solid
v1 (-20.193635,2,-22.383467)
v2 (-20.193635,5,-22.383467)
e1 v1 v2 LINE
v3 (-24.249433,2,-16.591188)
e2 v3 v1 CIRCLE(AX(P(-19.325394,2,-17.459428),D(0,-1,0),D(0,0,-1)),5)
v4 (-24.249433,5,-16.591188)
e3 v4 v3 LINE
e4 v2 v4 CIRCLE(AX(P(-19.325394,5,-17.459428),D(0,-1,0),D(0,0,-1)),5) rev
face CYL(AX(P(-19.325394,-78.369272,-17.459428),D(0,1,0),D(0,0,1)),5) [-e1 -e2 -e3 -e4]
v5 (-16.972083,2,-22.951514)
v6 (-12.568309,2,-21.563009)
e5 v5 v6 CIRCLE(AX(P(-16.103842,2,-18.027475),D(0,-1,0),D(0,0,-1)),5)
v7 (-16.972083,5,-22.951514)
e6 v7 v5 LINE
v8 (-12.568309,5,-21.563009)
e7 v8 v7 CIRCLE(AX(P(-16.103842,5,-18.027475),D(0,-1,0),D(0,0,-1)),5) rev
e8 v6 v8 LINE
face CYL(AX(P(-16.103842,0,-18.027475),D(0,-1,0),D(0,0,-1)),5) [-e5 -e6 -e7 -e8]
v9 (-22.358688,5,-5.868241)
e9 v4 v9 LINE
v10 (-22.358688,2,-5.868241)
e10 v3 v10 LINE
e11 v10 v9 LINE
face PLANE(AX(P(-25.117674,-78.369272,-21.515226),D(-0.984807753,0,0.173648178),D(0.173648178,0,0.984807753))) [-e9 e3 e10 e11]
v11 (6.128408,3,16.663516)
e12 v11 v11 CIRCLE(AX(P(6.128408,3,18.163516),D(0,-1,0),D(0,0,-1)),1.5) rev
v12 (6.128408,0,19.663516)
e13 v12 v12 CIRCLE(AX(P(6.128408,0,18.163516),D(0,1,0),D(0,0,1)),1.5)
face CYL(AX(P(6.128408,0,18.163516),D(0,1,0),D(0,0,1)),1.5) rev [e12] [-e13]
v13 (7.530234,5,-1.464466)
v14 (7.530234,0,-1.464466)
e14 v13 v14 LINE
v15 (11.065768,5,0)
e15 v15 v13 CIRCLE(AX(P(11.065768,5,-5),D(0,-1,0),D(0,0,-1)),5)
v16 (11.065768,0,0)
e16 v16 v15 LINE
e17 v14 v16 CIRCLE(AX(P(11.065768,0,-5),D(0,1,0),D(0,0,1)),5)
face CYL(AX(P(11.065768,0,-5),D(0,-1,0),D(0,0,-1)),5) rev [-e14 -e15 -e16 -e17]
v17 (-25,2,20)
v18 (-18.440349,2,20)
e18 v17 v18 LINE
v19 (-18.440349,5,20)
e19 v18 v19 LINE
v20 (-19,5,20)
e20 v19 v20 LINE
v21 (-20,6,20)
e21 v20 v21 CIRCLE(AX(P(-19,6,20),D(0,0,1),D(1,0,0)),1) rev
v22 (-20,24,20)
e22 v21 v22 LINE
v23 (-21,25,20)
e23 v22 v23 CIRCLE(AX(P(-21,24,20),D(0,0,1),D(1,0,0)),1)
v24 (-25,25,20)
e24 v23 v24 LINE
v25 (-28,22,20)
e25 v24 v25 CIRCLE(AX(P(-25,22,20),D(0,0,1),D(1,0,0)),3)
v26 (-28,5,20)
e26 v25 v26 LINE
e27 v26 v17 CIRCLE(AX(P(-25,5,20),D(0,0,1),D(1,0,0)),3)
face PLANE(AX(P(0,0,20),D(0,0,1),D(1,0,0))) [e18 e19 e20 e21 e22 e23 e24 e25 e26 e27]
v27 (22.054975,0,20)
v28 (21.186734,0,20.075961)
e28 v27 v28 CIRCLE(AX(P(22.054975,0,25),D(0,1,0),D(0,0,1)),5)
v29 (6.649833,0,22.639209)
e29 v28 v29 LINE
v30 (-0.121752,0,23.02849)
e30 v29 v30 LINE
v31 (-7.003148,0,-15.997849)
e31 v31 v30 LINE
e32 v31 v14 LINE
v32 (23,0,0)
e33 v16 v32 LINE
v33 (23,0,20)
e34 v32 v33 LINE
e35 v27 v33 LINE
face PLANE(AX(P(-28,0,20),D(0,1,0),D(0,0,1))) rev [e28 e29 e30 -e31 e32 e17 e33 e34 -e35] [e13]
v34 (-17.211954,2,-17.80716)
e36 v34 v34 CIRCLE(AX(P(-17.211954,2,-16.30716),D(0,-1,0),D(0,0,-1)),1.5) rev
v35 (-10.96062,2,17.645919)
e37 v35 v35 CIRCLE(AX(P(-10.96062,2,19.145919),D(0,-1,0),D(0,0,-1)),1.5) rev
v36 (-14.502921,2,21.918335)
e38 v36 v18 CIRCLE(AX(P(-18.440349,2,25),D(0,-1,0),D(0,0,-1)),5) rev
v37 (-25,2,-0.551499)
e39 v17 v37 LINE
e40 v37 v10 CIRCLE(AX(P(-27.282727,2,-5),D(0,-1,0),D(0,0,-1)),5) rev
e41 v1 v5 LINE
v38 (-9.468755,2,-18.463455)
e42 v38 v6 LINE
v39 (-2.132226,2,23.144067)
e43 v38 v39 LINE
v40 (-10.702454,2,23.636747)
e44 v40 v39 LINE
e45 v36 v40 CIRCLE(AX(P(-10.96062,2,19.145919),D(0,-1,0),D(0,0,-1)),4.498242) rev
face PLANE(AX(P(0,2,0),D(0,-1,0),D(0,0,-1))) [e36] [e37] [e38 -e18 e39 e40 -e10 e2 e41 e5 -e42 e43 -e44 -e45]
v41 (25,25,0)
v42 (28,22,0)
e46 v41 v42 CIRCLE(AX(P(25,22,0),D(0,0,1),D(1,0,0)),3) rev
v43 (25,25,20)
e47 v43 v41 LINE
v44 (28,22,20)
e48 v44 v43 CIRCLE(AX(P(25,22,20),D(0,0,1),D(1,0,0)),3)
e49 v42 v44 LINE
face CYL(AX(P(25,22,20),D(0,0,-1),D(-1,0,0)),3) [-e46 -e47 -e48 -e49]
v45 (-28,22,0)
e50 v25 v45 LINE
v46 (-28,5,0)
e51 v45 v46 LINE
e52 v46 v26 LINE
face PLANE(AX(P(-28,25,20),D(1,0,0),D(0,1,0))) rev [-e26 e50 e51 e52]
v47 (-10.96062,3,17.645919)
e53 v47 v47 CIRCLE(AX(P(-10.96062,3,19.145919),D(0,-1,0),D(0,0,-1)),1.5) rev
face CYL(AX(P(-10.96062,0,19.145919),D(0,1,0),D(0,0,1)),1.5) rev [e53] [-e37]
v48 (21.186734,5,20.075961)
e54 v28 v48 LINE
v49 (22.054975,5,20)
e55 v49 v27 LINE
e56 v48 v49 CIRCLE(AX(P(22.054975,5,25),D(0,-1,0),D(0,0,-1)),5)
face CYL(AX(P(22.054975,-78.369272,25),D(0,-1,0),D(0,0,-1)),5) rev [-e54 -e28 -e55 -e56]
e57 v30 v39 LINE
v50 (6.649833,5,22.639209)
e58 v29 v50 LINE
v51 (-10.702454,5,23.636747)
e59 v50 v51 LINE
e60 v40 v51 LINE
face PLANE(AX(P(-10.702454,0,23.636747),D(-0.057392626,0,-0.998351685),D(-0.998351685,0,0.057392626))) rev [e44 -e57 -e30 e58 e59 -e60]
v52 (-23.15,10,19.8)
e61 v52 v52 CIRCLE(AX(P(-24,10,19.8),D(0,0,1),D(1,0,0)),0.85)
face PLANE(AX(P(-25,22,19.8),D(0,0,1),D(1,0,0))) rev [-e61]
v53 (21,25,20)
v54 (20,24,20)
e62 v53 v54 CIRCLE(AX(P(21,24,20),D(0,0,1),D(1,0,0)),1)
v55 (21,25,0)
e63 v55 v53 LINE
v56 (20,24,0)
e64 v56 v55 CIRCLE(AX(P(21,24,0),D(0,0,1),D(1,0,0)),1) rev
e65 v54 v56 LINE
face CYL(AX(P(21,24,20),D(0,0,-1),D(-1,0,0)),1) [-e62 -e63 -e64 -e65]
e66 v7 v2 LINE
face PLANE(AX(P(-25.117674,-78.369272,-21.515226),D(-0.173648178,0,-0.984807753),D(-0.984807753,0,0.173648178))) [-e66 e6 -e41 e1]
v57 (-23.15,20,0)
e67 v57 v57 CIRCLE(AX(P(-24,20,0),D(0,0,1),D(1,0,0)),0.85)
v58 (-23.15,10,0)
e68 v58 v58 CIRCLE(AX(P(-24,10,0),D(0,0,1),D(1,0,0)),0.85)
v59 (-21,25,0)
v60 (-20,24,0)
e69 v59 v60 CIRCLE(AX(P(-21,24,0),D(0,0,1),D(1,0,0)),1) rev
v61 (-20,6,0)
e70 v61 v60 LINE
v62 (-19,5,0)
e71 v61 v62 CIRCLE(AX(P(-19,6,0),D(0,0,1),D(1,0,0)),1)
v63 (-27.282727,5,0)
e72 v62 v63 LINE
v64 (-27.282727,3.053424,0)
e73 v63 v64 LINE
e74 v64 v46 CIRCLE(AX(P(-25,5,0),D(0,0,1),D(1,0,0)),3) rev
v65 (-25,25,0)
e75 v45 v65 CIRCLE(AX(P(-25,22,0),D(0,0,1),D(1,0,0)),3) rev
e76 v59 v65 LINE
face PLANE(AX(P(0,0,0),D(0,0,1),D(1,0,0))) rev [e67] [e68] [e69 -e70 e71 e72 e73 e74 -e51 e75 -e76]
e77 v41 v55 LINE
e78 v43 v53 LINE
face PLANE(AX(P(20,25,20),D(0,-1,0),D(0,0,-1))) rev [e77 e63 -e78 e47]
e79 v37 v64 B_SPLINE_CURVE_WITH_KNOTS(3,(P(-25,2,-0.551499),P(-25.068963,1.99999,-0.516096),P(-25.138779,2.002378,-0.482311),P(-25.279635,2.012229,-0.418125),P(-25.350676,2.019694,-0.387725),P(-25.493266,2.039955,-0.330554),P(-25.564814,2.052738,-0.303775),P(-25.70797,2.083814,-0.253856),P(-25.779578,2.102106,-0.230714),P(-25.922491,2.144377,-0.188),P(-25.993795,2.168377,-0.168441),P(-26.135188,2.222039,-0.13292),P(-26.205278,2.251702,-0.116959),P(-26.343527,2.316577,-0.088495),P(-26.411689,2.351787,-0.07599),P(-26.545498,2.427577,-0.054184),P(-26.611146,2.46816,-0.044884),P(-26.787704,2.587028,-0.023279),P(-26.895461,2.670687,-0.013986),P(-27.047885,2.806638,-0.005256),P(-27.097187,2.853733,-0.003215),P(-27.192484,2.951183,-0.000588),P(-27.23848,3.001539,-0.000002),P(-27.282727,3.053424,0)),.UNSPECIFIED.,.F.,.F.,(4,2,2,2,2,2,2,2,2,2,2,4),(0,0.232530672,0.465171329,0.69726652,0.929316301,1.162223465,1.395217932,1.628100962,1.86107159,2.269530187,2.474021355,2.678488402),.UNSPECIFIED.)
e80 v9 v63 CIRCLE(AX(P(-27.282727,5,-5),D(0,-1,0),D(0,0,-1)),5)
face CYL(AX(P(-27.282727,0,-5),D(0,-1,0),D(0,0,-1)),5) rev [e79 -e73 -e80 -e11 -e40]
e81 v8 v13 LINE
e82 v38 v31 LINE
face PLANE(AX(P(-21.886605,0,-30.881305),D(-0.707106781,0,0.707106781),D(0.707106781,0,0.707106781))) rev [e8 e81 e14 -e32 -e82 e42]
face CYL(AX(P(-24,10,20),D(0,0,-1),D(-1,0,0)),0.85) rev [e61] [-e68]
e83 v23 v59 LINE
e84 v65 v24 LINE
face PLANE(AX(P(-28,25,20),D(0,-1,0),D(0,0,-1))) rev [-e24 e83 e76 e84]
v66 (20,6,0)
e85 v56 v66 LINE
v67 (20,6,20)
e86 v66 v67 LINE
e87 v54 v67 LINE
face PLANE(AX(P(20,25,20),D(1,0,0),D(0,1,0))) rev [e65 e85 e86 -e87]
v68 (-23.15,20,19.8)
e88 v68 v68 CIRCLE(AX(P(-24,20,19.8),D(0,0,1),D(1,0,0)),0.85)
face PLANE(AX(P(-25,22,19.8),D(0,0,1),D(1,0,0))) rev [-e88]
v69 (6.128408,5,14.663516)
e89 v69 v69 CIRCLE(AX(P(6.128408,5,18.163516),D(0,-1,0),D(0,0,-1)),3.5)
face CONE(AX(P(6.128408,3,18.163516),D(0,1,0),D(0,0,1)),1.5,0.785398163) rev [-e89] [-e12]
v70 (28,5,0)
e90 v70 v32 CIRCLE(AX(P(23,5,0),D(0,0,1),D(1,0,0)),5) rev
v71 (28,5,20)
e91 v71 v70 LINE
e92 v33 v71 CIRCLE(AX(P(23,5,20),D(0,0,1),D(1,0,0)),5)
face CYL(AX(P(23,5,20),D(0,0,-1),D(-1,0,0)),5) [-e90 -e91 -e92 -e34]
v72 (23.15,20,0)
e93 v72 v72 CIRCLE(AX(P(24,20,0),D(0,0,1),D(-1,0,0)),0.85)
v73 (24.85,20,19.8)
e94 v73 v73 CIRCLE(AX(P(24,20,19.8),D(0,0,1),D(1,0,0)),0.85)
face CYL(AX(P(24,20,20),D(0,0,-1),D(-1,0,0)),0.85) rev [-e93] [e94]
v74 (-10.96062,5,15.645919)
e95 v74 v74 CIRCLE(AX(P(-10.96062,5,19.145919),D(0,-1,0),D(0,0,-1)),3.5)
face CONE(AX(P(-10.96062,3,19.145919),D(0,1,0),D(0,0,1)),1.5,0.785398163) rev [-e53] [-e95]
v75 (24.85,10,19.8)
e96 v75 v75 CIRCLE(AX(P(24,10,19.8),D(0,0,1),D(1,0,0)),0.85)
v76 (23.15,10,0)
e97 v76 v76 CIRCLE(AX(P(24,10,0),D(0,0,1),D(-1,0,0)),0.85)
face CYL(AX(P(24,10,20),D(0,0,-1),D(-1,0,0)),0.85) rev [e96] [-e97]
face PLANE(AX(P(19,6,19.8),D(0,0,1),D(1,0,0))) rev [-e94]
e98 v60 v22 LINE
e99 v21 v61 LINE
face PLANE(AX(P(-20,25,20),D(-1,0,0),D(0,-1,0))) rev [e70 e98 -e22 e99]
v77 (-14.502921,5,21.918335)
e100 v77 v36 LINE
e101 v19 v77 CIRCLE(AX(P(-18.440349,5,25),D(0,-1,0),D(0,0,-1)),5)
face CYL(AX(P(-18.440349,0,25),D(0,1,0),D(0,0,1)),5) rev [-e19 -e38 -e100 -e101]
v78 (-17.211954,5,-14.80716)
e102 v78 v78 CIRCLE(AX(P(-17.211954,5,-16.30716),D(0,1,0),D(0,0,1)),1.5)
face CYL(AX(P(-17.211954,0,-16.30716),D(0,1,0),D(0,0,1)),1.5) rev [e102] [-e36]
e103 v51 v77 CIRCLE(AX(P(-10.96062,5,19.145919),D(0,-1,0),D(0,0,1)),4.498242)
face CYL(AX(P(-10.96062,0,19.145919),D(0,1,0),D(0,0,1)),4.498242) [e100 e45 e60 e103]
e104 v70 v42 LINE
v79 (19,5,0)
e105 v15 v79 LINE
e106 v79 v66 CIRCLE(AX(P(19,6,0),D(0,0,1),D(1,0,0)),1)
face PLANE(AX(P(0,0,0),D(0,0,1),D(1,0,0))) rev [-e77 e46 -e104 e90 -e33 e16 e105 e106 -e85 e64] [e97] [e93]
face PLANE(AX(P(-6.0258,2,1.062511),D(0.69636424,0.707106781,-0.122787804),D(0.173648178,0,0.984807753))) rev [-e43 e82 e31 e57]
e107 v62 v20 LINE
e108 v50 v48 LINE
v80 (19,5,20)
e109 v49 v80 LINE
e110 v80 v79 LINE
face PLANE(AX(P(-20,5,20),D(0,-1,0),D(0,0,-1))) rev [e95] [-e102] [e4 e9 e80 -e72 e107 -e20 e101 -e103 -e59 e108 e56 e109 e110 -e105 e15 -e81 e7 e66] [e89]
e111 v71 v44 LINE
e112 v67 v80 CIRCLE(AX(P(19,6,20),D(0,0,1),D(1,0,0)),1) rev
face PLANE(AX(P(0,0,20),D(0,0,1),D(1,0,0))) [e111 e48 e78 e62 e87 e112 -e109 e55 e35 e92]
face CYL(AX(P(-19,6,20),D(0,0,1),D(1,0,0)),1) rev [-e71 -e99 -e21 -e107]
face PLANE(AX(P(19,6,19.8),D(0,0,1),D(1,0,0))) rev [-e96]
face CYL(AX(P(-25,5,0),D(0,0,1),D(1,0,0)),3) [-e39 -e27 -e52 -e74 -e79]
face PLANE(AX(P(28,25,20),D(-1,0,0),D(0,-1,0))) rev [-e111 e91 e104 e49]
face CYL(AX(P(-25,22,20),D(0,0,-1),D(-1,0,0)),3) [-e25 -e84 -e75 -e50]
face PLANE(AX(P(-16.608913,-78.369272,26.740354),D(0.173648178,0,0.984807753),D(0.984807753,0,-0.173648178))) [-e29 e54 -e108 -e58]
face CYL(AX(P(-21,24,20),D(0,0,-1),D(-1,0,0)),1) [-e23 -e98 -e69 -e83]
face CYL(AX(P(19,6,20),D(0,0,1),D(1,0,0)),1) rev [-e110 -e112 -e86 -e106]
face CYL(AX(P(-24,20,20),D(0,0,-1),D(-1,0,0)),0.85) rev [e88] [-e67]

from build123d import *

# Parameters (mm, degrees)
ESQUISSE1_R             = 0.85
BOSS_EXTRU_1_DEPTH      = 20
BOSS_EXTRU_2_DEPTH      = 5
ESQUISSE3_R             = 1.5
ENL_V_MAT_EXTRU_1_DEPTH = 47.234781527
CONG_1_R                = 1
CONG_2_R                = 3
CHANFREIN2_SIZE         = 2
ENL_V_MAT_EXTRU_2_DEPTH = 2
CHANFREIN3_SIZE         = 2
ENL_V_MAT_EXTRU_3_DEPTH = 47.234781527
CONG_3_R                = 5
CONG_4_R                = 3
BOSS_EXTRU_3_DEPTH      = 0.2


with BuildPart() as part:
    # Esquisse1 → Boss.-Extru.1 (new body)
    with BuildSketch(Plane.XY):
        Polygon((20, 25), (28, 25), (28, 0), (-28, 0), (-28, 25), (-20, 25), (-20, 5), (20, 5), align=None)
        with Locations((-24, 20)):
            Circle(ESQUISSE1_R, mode=Mode.SUBTRACT)
        with Locations((-24, 10)):
            Circle(ESQUISSE1_R, mode=Mode.SUBTRACT)
        with Locations(Location((24, 10, 0), (0, 0, 180))):
            Circle(ESQUISSE1_R, mode=Mode.SUBTRACT)
        with Locations(Location((24, 20, 0), (0, 0, 180))):
            Circle(ESQUISSE1_R, mode=Mode.SUBTRACT)
    extrude(amount=BOSS_EXTRU_1_DEPTH)

    # Esquisse2 → Boss.-Extru.2 (add)
    with BuildSketch(Plane(origin=(0, 5, 0), x_dir=(1, 0, 0), z_dir=(0, 1, 0))):
        Polygon((-25.117673753, 21.515226358), (28, 30.881305394), (28, -18.874598589), (-16.608913047, -26.740353539), align=None)
    extrude(amount=-BOSS_EXTRU_2_DEPTH)

    # Esquisse3 → Enlèv. mat.-Extru.1 (cut, through all)
    with BuildSketch(Plane(origin=(0, 5, 0), x_dir=(1, 0, 0), z_dir=(0, 1, 0))):
        with Locations(Location((-17.211954407, 16.307159752, 0), (0, 0, 270))):
            Circle(ESQUISSE3_R)
        with Locations(Location((6.128408145, -18.163515842, 0), (0, 0, 270))):
            Circle(ESQUISSE3_R)
        with Locations(Location((-10.960620011, -19.145919356, 0), (0, 0, 270))):
            Circle(ESQUISSE3_R)
    extrude(amount=-ENL_V_MAT_EXTRU_1_DEPTH, mode=Mode.SUBTRACT)

    # Congé1
    cong_1_edges = [part.edges().sort_by_distance(p)[0] for p in [
        (-20, 25, 10),
        (-20, 5, 10),
        (20, 5, 10),
        (20, 25, 10),
    ]]
    fillet(cong_1_edges, radius=CONG_1_R)

    # Congé2
    cong_2_edges = [part.edges().sort_by_distance(p)[0] for p in [
        (-28, 25, 10),
        (28, 25, 10),
    ]]
    fillet(cong_2_edges, radius=CONG_2_R)

    # Chanfrein2
    chanfrein2_edges = [part.edges().sort_by_distance(p)[0] for p in [
        (-10.960620011, 5, 17.645919356),
        (6.128408145, 5, 16.663515842),
    ]]
    chamfer(chanfrein2_edges, length=CHANFREIN2_SIZE)

    # Esquisse4 → Enlèv. mat.-Extru.2 (cut)
    with BuildSketch(Plane.XZ):
        Polygon((-48.23971452, 32.31771726), (0.015865378, 23.808956555), (-8.492895328, -24.446623343), (-56.748475225, -15.937862637), align=None)
    extrude(amount=-ENL_V_MAT_EXTRU_2_DEPTH, mode=Mode.SUBTRACT)

    # Chanfrein3
    chanfrein3_edges = [part.edges().sort_by_distance(p)[0] for p in [
        (-4.238514975, 2, -0.318833394),
    ]]
    chamfer(chanfrein3_edges, length=CHANFREIN3_SIZE - 0.0001)  # a hair under: the kernel refuses the full size

    # Esquisse5 → Enlèv. mat.-Extru.3 (cut, through all)
    with BuildSketch(Plane(origin=(0, 5, 0), x_dir=(1, 0, 0), z_dir=(0, 1, 0))):
        with BuildLine():
            Line((-28, -20), (-15.377035546, -20))
            ThreePointArc((-15.377035546, -20), (-13.722728197, -22.696262762), (-10.702454097, -23.636746706))
            Line((-10.702454097, -23.636746706), (6.649832575, -22.639209149))
            Line((6.649832575, -22.639209149), (6.649832575, -26.740353539))
            Line((6.649832575, -26.740353539), (-28, -26.740353539))
            Line((-28, -26.740353539), (-28, -20))
        make_face()
        Polygon((28, 30.881305394), (-21.886605112, 30.881305394), (8.994700282, 0), (28, 0), align=None)
    extrude(amount=-ENL_V_MAT_EXTRU_3_DEPTH, mode=Mode.SUBTRACT)

    # Congé3
    cong_3_edges = [part.edges().sort_by_distance(p)[0] for p in [
        (28, 0, 10),
        (-25.117673753, 3.5, -21.515226358),
        (-15.377035546, 3.5, 20),
        (-14.408791034, 3.5, -23.403491315),
        (8.994700282, 2.5, 0),
        (-21.32395885, 3.5, 0),
        (21.617531437, 2.5, 20),
    ]]
    fillet(cong_3_edges, radius=CONG_3_R)

    # Congé4
    cong_4_edges = [part.edges().sort_by_distance(p)[0] for p in [
        (-28, 2, 10),
    ]]
    fillet(cong_4_edges, radius=CONG_4_R)

    # Esquisse6 → Boss.-Extru.3 (add)
    with BuildSketch(Plane.XY.offset(20)):
        with BuildLine():
            Line((-28, 22), (-28, 5))
            ThreePointArc((-28, 5), (-27.121320344, 2.878679656), (-25, 2))
            Line((-25, 2), (-18.440348512, 2))
            Line((-18.440348512, 2), (-18.440348512, 5))
            Line((-18.440348512, 5), (-19, 5))
            ThreePointArc((-19, 5), (-19.707106781, 5.292893219), (-20, 6))
            Line((-20, 6), (-20, 24))
            ThreePointArc((-20, 24), (-20.292893219, 24.707106781), (-21, 25))
            Line((-21, 25), (-25, 25))
            ThreePointArc((-25, 25), (-27.121320344, 24.121320344), (-28, 22))
        make_face()
        with BuildLine():
            Line((19, 5), (22.054974755, 5))
            Line((22.054974755, 5), (22.054974755, 0))
            Line((22.054974755, 0), (23, 0))
            ThreePointArc((23, 0), (26.535533906, 1.464466094), (28, 5))
            Line((28, 5), (28, 22))
            ThreePointArc((28, 22), (27.121320344, 24.121320344), (25, 25))
            Line((25, 25), (21, 25))
            ThreePointArc((21, 25), (20.292893219, 24.707106781), (20, 24))
            Line((20, 24), (20, 6))
            ThreePointArc((20, 6), (19.707106781, 5.292893219), (19, 5))
        make_face()
    extrude(amount=-BOSS_EXTRU_3_DEPTH)


solid = part.part
